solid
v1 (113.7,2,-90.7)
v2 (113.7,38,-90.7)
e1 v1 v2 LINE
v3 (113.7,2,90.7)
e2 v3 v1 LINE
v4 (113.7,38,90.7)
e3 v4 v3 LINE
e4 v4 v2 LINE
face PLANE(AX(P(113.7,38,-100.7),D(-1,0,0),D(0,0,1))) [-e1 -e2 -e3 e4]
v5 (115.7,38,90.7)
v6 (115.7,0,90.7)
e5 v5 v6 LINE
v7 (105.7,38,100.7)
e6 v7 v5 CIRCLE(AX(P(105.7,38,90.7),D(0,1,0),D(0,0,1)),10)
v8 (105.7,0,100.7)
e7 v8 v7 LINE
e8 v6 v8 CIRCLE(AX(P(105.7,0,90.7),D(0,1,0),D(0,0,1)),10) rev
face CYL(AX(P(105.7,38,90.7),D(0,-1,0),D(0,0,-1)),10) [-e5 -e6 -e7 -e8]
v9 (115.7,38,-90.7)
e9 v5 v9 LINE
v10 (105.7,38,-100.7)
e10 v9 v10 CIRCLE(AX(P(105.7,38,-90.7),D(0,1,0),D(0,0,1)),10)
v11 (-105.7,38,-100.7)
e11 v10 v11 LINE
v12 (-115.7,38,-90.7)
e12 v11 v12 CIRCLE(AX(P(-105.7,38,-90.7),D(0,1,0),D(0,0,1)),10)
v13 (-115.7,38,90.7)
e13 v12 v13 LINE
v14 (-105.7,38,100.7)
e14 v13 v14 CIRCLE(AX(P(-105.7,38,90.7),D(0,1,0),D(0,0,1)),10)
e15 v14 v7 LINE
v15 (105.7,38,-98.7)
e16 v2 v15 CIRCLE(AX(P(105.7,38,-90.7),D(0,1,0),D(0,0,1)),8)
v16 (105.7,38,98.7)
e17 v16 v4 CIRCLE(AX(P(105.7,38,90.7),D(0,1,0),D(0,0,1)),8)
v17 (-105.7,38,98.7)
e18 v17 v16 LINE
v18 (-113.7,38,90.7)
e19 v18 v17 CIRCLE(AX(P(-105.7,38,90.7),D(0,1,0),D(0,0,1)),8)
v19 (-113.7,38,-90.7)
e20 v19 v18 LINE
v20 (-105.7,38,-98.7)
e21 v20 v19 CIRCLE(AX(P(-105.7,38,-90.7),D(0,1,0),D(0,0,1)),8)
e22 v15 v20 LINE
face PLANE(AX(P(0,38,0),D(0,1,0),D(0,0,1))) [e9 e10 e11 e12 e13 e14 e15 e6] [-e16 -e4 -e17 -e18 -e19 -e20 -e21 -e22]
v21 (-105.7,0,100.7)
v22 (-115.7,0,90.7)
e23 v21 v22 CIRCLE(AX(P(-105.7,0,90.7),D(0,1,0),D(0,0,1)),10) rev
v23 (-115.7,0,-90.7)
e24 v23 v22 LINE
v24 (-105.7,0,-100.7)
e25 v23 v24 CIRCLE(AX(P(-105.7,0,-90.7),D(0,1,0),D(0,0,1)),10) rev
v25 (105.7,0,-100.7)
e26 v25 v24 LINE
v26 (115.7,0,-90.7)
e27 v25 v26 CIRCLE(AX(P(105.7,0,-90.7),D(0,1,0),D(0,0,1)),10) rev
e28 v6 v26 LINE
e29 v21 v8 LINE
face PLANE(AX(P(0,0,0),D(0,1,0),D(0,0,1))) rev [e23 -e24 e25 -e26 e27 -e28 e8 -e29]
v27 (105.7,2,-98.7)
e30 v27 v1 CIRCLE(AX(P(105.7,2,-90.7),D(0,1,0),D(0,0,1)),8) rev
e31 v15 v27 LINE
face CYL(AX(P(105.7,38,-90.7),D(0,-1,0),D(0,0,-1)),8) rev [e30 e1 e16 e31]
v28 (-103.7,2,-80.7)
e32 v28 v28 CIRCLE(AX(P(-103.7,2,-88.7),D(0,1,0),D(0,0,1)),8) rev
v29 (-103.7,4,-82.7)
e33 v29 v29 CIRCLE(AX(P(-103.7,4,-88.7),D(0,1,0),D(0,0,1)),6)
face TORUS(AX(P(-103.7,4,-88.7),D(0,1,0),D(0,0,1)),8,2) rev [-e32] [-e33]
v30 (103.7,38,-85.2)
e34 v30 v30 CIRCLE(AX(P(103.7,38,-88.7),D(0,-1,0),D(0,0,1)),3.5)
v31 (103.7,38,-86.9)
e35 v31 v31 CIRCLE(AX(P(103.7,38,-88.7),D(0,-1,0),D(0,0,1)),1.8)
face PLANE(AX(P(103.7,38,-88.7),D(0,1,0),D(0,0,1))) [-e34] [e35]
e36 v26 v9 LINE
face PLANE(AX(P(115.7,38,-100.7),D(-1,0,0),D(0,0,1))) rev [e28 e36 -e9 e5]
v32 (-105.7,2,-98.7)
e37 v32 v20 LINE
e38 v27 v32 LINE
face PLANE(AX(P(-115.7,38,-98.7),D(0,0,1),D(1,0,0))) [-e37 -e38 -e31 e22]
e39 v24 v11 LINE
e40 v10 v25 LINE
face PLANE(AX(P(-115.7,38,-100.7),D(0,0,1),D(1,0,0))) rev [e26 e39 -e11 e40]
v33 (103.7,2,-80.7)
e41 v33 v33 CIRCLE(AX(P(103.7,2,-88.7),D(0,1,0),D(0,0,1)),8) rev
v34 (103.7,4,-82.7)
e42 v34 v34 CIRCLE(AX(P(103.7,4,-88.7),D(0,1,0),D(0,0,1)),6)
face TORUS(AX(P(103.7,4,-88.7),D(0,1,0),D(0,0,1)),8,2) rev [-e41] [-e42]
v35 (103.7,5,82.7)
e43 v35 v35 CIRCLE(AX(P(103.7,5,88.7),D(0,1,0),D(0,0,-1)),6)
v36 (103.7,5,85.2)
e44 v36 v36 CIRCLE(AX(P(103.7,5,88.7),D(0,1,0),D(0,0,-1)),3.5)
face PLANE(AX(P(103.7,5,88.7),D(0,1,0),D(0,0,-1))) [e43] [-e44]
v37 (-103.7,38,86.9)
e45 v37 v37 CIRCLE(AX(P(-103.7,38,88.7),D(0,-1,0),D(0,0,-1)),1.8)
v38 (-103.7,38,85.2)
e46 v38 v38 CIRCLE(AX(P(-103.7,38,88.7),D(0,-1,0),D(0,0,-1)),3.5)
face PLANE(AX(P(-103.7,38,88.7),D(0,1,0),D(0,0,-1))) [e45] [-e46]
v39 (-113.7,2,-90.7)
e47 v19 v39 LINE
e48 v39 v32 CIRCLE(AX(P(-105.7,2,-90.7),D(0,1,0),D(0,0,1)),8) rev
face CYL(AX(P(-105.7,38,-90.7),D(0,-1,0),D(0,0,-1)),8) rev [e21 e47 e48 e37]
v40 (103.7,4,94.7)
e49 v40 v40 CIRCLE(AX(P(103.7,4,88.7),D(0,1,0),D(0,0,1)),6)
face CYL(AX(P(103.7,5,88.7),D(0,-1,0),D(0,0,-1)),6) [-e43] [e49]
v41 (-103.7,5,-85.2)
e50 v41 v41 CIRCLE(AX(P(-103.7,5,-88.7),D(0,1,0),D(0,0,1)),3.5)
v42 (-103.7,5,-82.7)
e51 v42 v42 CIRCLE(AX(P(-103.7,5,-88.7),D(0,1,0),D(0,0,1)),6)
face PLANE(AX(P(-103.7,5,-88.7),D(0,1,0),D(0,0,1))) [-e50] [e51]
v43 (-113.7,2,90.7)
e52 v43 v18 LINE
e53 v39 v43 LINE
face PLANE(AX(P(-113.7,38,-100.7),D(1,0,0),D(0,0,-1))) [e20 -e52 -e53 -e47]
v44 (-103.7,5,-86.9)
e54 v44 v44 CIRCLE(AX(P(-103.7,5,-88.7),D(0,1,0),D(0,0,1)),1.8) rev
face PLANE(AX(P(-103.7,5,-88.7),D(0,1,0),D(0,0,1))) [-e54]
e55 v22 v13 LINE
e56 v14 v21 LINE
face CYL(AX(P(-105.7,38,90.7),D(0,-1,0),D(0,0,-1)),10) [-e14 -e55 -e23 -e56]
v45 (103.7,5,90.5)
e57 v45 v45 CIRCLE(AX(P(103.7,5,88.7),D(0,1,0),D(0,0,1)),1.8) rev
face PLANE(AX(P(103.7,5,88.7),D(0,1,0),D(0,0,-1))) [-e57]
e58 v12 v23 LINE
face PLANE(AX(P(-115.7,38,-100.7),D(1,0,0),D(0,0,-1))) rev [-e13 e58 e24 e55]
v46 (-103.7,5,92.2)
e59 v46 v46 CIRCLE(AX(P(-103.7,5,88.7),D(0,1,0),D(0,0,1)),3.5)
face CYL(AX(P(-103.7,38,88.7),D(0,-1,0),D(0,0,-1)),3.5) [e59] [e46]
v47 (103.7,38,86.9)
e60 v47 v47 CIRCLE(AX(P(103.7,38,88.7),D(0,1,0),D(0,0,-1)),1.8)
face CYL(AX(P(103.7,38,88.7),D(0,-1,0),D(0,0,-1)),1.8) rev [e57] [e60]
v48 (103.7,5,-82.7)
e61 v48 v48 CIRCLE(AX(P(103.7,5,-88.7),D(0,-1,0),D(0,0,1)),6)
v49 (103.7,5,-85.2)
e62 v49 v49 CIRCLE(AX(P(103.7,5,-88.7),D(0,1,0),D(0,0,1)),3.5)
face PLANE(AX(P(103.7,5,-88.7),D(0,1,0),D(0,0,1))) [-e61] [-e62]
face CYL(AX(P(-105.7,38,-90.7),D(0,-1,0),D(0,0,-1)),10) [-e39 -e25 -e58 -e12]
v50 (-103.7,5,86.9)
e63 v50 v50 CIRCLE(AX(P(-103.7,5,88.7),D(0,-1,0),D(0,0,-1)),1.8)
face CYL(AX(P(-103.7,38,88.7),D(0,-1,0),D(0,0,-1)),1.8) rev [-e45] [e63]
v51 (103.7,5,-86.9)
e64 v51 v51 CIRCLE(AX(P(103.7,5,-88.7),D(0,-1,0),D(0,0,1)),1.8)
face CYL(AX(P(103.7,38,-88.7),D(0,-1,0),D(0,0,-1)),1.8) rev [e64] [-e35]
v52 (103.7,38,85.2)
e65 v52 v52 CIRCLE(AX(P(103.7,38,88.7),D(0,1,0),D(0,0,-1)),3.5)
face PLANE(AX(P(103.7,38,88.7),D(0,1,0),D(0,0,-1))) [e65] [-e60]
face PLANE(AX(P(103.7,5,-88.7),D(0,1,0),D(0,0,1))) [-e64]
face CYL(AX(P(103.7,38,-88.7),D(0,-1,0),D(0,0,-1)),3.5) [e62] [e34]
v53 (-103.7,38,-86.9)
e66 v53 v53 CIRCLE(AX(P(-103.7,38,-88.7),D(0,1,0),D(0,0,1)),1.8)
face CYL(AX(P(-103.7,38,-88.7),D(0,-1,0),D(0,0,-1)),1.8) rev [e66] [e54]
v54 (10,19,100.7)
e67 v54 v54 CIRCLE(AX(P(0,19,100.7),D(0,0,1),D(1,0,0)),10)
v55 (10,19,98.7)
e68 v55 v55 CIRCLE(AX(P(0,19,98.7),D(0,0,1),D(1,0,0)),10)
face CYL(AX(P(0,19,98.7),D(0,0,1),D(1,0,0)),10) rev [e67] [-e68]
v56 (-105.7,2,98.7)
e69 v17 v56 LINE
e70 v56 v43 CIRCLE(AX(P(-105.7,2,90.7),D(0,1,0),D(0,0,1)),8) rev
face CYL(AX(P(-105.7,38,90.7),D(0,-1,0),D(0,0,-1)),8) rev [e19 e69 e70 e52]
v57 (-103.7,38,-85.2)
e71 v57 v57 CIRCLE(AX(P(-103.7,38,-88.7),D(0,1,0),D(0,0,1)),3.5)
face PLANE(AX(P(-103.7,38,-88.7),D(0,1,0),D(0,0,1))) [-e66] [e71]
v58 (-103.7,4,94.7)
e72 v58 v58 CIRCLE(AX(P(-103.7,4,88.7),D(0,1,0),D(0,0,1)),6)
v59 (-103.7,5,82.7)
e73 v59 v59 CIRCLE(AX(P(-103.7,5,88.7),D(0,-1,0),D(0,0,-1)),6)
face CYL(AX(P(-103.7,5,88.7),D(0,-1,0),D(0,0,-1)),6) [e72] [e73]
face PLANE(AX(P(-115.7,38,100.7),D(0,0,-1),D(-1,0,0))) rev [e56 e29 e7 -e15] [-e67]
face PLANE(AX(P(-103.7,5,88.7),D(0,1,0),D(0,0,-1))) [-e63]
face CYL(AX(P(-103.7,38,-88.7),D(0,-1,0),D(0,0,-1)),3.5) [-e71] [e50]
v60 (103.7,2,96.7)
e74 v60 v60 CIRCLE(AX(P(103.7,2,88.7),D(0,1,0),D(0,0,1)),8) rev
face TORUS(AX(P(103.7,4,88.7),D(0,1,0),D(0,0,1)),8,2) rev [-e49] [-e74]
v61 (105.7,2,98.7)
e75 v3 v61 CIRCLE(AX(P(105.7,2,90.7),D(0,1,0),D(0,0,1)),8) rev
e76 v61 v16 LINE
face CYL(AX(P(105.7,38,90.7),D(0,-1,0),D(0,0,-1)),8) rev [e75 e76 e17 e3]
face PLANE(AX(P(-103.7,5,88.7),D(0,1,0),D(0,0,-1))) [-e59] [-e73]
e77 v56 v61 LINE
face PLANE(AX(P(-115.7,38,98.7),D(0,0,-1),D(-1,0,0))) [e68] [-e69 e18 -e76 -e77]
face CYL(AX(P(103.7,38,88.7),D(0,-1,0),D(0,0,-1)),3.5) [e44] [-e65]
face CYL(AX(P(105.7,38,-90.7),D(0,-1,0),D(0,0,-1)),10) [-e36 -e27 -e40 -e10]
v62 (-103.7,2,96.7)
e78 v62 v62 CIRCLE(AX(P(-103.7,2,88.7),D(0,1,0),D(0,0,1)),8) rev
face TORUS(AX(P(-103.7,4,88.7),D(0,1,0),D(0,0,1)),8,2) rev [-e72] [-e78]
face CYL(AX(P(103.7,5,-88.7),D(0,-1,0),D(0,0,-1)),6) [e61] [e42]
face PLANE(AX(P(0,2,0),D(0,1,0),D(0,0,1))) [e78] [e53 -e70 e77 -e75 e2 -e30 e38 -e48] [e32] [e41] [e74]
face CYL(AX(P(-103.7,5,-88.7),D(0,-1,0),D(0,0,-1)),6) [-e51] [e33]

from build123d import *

# Parameters (mm, degrees)
SKETCH1_W            = 231.4
SKETCH1_H            = 201.4
BOSS_EXTRUDE1_DEPTH  = 38
FILLET1_R            = 10
SHELL1_T             = -2
SKETCH2_R            = 10
CUT_EXTRUDE1_DEPTH   = 2
SKETCH3_R            = 6
BOSS_EXTRUDE2_DEPTH  = 3
SKETCH4_R            = 3.5
SKETCH4_R_2          = 1.8
BOSS_EXTRUDE3_DEPTH  = 33
FILLET2_R            = 2
FILLET2_OF_MIRROR1_R = 2


# Read off the part's stored shape, not the designer's step: Mirror2
with BuildPart() as part:
    # Sketch1 → Boss-Extrude1 (new body)
    with BuildSketch(Plane(origin=(0, 0, 0), x_dir=(1, 0, 0), z_dir=(0, 1, 0))):
        Rectangle(SKETCH1_W, SKETCH1_H)
    extrude(amount=BOSS_EXTRUDE1_DEPTH)

    # Fillet1
    fillet1_edges = [part.edges().sort_by_distance(p)[0] for p in [
        (-115.7, 19, -100.7),
        (115.7, 19, -100.7),
        (115.7, 19, 100.7),
        (-115.7, 19, 100.7),
    ]]
    fillet(fillet1_edges, radius=FILLET1_R)

    # Shell1
    shell1_openings = [part.faces().sort_by_distance(p)[0] for p in [
        (0, 38, 0),
    ]]
    offset(amount=SHELL1_T, openings=shell1_openings, kind=Kind.INTERSECTION)

    # Sketch2 → Cut-Extrude1 (cut)
    with BuildSketch(Plane.XY.offset(100.7)):
        with Locations((0, 19)):
            Circle(SKETCH2_R)
    extrude(amount=-CUT_EXTRUDE1_DEPTH, mode=Mode.SUBTRACT)

    # Sketch3 → Boss-Extrude2 (add)
    with BuildSketch(Plane(origin=(0, 2, 0), x_dir=(1, 0, 0), z_dir=(0, 1, 0))):
        with Locations(Location((-103.7, 88.7, 0), (0, 0, 270))):
            Circle(SKETCH3_R)
    boss_extrude2 = extrude(amount=BOSS_EXTRUDE2_DEPTH)

    # Sketch4 → Boss-Extrude3 (add)
    with BuildSketch(Plane(origin=(0, 5, 0), x_dir=(1, 0, 0), z_dir=(0, 1, 0))):
        with Locations(Location((-103.7, 88.7, 0), (0, 0, 270))):
            Circle(SKETCH4_R)
        with Locations(Location((-103.7, 88.7, 0), (0, 0, 270))):
            Circle(SKETCH4_R_2, mode=Mode.SUBTRACT)
    boss_extrude3 = extrude(amount=BOSS_EXTRUDE3_DEPTH)

    # Fillet2
    fillet2_edges = [part.edges().sort_by_distance(p)[0] for p in [
        (-103.7, 2, -94.7),
    ]]
    fillet(fillet2_edges, radius=FILLET2_R)

    # Mirror1: Boss-Extrude2, Boss-Extrude3 across plane
    add(boss_extrude2.mirror(Plane(origin=(0, 0, 0), x_dir=(0, 0, 1), z_dir=(1, 0, 0))))
    add(boss_extrude3.mirror(Plane(origin=(0, 0, 0), x_dir=(0, 0, 1), z_dir=(1, 0, 0))))

    # Fillet2 of Mirror1
    fillet2_of_mirror1_edges = [part.edges().sort_by_distance(p)[0] for p in [
        (103.7, 2, -94.7),
    ]]
    fillet(fillet2_of_mirror1_edges, radius=FILLET2_OF_MIRROR1_R)

    # Mirror2 outline → Mirror2 (revolve)
    with BuildSketch(Plane(origin=(103.7, 0, 88.7), x_dir=(1, 0, 0), z_dir=(0, 0, 1))):
        with BuildLine():
            Line((3.5, 38), (1.8, 38))
            Line((1.8, 38), (1.8, 5))
            Line((1.8, 5), (0, 5))
            Line((0, 5), (0, 2))
            Line((0, 2), (8, 2))
            ThreePointArc((8, 2), (6.585786438, 2.585786438), (6, 4))
            Line((6, 4), (6, 5))
            Line((6, 5), (3.5, 5))
            Line((3.5, 5), (3.5, 38))
        make_face()
    revolve(axis=Axis((103.7, 0, 88.7), (0, 1, 0)))

    # Mirror2 2 outline → Mirror2 2 (revolve)
    with BuildSketch(Plane(origin=(-103.7, 0, 88.7), x_dir=(1, 0, 0), z_dir=(0, 0, 1))):
        with BuildLine():
            Line((3.5, 38), (1.8, 38))
            Line((1.8, 38), (1.8, 5))
            Line((1.8, 5), (0, 5))
            Line((0, 5), (0, 2))
            Line((0, 2), (8, 2))
            ThreePointArc((8, 2), (6.585786438, 2.585786438), (6, 4))
            Line((6, 4), (6, 5))
            Line((6, 5), (3.5, 5))
            Line((3.5, 5), (3.5, 38))
        make_face()
    revolve(axis=Axis((-103.7, 0, 88.7), (0, 1, 0)))


solid = part.part
